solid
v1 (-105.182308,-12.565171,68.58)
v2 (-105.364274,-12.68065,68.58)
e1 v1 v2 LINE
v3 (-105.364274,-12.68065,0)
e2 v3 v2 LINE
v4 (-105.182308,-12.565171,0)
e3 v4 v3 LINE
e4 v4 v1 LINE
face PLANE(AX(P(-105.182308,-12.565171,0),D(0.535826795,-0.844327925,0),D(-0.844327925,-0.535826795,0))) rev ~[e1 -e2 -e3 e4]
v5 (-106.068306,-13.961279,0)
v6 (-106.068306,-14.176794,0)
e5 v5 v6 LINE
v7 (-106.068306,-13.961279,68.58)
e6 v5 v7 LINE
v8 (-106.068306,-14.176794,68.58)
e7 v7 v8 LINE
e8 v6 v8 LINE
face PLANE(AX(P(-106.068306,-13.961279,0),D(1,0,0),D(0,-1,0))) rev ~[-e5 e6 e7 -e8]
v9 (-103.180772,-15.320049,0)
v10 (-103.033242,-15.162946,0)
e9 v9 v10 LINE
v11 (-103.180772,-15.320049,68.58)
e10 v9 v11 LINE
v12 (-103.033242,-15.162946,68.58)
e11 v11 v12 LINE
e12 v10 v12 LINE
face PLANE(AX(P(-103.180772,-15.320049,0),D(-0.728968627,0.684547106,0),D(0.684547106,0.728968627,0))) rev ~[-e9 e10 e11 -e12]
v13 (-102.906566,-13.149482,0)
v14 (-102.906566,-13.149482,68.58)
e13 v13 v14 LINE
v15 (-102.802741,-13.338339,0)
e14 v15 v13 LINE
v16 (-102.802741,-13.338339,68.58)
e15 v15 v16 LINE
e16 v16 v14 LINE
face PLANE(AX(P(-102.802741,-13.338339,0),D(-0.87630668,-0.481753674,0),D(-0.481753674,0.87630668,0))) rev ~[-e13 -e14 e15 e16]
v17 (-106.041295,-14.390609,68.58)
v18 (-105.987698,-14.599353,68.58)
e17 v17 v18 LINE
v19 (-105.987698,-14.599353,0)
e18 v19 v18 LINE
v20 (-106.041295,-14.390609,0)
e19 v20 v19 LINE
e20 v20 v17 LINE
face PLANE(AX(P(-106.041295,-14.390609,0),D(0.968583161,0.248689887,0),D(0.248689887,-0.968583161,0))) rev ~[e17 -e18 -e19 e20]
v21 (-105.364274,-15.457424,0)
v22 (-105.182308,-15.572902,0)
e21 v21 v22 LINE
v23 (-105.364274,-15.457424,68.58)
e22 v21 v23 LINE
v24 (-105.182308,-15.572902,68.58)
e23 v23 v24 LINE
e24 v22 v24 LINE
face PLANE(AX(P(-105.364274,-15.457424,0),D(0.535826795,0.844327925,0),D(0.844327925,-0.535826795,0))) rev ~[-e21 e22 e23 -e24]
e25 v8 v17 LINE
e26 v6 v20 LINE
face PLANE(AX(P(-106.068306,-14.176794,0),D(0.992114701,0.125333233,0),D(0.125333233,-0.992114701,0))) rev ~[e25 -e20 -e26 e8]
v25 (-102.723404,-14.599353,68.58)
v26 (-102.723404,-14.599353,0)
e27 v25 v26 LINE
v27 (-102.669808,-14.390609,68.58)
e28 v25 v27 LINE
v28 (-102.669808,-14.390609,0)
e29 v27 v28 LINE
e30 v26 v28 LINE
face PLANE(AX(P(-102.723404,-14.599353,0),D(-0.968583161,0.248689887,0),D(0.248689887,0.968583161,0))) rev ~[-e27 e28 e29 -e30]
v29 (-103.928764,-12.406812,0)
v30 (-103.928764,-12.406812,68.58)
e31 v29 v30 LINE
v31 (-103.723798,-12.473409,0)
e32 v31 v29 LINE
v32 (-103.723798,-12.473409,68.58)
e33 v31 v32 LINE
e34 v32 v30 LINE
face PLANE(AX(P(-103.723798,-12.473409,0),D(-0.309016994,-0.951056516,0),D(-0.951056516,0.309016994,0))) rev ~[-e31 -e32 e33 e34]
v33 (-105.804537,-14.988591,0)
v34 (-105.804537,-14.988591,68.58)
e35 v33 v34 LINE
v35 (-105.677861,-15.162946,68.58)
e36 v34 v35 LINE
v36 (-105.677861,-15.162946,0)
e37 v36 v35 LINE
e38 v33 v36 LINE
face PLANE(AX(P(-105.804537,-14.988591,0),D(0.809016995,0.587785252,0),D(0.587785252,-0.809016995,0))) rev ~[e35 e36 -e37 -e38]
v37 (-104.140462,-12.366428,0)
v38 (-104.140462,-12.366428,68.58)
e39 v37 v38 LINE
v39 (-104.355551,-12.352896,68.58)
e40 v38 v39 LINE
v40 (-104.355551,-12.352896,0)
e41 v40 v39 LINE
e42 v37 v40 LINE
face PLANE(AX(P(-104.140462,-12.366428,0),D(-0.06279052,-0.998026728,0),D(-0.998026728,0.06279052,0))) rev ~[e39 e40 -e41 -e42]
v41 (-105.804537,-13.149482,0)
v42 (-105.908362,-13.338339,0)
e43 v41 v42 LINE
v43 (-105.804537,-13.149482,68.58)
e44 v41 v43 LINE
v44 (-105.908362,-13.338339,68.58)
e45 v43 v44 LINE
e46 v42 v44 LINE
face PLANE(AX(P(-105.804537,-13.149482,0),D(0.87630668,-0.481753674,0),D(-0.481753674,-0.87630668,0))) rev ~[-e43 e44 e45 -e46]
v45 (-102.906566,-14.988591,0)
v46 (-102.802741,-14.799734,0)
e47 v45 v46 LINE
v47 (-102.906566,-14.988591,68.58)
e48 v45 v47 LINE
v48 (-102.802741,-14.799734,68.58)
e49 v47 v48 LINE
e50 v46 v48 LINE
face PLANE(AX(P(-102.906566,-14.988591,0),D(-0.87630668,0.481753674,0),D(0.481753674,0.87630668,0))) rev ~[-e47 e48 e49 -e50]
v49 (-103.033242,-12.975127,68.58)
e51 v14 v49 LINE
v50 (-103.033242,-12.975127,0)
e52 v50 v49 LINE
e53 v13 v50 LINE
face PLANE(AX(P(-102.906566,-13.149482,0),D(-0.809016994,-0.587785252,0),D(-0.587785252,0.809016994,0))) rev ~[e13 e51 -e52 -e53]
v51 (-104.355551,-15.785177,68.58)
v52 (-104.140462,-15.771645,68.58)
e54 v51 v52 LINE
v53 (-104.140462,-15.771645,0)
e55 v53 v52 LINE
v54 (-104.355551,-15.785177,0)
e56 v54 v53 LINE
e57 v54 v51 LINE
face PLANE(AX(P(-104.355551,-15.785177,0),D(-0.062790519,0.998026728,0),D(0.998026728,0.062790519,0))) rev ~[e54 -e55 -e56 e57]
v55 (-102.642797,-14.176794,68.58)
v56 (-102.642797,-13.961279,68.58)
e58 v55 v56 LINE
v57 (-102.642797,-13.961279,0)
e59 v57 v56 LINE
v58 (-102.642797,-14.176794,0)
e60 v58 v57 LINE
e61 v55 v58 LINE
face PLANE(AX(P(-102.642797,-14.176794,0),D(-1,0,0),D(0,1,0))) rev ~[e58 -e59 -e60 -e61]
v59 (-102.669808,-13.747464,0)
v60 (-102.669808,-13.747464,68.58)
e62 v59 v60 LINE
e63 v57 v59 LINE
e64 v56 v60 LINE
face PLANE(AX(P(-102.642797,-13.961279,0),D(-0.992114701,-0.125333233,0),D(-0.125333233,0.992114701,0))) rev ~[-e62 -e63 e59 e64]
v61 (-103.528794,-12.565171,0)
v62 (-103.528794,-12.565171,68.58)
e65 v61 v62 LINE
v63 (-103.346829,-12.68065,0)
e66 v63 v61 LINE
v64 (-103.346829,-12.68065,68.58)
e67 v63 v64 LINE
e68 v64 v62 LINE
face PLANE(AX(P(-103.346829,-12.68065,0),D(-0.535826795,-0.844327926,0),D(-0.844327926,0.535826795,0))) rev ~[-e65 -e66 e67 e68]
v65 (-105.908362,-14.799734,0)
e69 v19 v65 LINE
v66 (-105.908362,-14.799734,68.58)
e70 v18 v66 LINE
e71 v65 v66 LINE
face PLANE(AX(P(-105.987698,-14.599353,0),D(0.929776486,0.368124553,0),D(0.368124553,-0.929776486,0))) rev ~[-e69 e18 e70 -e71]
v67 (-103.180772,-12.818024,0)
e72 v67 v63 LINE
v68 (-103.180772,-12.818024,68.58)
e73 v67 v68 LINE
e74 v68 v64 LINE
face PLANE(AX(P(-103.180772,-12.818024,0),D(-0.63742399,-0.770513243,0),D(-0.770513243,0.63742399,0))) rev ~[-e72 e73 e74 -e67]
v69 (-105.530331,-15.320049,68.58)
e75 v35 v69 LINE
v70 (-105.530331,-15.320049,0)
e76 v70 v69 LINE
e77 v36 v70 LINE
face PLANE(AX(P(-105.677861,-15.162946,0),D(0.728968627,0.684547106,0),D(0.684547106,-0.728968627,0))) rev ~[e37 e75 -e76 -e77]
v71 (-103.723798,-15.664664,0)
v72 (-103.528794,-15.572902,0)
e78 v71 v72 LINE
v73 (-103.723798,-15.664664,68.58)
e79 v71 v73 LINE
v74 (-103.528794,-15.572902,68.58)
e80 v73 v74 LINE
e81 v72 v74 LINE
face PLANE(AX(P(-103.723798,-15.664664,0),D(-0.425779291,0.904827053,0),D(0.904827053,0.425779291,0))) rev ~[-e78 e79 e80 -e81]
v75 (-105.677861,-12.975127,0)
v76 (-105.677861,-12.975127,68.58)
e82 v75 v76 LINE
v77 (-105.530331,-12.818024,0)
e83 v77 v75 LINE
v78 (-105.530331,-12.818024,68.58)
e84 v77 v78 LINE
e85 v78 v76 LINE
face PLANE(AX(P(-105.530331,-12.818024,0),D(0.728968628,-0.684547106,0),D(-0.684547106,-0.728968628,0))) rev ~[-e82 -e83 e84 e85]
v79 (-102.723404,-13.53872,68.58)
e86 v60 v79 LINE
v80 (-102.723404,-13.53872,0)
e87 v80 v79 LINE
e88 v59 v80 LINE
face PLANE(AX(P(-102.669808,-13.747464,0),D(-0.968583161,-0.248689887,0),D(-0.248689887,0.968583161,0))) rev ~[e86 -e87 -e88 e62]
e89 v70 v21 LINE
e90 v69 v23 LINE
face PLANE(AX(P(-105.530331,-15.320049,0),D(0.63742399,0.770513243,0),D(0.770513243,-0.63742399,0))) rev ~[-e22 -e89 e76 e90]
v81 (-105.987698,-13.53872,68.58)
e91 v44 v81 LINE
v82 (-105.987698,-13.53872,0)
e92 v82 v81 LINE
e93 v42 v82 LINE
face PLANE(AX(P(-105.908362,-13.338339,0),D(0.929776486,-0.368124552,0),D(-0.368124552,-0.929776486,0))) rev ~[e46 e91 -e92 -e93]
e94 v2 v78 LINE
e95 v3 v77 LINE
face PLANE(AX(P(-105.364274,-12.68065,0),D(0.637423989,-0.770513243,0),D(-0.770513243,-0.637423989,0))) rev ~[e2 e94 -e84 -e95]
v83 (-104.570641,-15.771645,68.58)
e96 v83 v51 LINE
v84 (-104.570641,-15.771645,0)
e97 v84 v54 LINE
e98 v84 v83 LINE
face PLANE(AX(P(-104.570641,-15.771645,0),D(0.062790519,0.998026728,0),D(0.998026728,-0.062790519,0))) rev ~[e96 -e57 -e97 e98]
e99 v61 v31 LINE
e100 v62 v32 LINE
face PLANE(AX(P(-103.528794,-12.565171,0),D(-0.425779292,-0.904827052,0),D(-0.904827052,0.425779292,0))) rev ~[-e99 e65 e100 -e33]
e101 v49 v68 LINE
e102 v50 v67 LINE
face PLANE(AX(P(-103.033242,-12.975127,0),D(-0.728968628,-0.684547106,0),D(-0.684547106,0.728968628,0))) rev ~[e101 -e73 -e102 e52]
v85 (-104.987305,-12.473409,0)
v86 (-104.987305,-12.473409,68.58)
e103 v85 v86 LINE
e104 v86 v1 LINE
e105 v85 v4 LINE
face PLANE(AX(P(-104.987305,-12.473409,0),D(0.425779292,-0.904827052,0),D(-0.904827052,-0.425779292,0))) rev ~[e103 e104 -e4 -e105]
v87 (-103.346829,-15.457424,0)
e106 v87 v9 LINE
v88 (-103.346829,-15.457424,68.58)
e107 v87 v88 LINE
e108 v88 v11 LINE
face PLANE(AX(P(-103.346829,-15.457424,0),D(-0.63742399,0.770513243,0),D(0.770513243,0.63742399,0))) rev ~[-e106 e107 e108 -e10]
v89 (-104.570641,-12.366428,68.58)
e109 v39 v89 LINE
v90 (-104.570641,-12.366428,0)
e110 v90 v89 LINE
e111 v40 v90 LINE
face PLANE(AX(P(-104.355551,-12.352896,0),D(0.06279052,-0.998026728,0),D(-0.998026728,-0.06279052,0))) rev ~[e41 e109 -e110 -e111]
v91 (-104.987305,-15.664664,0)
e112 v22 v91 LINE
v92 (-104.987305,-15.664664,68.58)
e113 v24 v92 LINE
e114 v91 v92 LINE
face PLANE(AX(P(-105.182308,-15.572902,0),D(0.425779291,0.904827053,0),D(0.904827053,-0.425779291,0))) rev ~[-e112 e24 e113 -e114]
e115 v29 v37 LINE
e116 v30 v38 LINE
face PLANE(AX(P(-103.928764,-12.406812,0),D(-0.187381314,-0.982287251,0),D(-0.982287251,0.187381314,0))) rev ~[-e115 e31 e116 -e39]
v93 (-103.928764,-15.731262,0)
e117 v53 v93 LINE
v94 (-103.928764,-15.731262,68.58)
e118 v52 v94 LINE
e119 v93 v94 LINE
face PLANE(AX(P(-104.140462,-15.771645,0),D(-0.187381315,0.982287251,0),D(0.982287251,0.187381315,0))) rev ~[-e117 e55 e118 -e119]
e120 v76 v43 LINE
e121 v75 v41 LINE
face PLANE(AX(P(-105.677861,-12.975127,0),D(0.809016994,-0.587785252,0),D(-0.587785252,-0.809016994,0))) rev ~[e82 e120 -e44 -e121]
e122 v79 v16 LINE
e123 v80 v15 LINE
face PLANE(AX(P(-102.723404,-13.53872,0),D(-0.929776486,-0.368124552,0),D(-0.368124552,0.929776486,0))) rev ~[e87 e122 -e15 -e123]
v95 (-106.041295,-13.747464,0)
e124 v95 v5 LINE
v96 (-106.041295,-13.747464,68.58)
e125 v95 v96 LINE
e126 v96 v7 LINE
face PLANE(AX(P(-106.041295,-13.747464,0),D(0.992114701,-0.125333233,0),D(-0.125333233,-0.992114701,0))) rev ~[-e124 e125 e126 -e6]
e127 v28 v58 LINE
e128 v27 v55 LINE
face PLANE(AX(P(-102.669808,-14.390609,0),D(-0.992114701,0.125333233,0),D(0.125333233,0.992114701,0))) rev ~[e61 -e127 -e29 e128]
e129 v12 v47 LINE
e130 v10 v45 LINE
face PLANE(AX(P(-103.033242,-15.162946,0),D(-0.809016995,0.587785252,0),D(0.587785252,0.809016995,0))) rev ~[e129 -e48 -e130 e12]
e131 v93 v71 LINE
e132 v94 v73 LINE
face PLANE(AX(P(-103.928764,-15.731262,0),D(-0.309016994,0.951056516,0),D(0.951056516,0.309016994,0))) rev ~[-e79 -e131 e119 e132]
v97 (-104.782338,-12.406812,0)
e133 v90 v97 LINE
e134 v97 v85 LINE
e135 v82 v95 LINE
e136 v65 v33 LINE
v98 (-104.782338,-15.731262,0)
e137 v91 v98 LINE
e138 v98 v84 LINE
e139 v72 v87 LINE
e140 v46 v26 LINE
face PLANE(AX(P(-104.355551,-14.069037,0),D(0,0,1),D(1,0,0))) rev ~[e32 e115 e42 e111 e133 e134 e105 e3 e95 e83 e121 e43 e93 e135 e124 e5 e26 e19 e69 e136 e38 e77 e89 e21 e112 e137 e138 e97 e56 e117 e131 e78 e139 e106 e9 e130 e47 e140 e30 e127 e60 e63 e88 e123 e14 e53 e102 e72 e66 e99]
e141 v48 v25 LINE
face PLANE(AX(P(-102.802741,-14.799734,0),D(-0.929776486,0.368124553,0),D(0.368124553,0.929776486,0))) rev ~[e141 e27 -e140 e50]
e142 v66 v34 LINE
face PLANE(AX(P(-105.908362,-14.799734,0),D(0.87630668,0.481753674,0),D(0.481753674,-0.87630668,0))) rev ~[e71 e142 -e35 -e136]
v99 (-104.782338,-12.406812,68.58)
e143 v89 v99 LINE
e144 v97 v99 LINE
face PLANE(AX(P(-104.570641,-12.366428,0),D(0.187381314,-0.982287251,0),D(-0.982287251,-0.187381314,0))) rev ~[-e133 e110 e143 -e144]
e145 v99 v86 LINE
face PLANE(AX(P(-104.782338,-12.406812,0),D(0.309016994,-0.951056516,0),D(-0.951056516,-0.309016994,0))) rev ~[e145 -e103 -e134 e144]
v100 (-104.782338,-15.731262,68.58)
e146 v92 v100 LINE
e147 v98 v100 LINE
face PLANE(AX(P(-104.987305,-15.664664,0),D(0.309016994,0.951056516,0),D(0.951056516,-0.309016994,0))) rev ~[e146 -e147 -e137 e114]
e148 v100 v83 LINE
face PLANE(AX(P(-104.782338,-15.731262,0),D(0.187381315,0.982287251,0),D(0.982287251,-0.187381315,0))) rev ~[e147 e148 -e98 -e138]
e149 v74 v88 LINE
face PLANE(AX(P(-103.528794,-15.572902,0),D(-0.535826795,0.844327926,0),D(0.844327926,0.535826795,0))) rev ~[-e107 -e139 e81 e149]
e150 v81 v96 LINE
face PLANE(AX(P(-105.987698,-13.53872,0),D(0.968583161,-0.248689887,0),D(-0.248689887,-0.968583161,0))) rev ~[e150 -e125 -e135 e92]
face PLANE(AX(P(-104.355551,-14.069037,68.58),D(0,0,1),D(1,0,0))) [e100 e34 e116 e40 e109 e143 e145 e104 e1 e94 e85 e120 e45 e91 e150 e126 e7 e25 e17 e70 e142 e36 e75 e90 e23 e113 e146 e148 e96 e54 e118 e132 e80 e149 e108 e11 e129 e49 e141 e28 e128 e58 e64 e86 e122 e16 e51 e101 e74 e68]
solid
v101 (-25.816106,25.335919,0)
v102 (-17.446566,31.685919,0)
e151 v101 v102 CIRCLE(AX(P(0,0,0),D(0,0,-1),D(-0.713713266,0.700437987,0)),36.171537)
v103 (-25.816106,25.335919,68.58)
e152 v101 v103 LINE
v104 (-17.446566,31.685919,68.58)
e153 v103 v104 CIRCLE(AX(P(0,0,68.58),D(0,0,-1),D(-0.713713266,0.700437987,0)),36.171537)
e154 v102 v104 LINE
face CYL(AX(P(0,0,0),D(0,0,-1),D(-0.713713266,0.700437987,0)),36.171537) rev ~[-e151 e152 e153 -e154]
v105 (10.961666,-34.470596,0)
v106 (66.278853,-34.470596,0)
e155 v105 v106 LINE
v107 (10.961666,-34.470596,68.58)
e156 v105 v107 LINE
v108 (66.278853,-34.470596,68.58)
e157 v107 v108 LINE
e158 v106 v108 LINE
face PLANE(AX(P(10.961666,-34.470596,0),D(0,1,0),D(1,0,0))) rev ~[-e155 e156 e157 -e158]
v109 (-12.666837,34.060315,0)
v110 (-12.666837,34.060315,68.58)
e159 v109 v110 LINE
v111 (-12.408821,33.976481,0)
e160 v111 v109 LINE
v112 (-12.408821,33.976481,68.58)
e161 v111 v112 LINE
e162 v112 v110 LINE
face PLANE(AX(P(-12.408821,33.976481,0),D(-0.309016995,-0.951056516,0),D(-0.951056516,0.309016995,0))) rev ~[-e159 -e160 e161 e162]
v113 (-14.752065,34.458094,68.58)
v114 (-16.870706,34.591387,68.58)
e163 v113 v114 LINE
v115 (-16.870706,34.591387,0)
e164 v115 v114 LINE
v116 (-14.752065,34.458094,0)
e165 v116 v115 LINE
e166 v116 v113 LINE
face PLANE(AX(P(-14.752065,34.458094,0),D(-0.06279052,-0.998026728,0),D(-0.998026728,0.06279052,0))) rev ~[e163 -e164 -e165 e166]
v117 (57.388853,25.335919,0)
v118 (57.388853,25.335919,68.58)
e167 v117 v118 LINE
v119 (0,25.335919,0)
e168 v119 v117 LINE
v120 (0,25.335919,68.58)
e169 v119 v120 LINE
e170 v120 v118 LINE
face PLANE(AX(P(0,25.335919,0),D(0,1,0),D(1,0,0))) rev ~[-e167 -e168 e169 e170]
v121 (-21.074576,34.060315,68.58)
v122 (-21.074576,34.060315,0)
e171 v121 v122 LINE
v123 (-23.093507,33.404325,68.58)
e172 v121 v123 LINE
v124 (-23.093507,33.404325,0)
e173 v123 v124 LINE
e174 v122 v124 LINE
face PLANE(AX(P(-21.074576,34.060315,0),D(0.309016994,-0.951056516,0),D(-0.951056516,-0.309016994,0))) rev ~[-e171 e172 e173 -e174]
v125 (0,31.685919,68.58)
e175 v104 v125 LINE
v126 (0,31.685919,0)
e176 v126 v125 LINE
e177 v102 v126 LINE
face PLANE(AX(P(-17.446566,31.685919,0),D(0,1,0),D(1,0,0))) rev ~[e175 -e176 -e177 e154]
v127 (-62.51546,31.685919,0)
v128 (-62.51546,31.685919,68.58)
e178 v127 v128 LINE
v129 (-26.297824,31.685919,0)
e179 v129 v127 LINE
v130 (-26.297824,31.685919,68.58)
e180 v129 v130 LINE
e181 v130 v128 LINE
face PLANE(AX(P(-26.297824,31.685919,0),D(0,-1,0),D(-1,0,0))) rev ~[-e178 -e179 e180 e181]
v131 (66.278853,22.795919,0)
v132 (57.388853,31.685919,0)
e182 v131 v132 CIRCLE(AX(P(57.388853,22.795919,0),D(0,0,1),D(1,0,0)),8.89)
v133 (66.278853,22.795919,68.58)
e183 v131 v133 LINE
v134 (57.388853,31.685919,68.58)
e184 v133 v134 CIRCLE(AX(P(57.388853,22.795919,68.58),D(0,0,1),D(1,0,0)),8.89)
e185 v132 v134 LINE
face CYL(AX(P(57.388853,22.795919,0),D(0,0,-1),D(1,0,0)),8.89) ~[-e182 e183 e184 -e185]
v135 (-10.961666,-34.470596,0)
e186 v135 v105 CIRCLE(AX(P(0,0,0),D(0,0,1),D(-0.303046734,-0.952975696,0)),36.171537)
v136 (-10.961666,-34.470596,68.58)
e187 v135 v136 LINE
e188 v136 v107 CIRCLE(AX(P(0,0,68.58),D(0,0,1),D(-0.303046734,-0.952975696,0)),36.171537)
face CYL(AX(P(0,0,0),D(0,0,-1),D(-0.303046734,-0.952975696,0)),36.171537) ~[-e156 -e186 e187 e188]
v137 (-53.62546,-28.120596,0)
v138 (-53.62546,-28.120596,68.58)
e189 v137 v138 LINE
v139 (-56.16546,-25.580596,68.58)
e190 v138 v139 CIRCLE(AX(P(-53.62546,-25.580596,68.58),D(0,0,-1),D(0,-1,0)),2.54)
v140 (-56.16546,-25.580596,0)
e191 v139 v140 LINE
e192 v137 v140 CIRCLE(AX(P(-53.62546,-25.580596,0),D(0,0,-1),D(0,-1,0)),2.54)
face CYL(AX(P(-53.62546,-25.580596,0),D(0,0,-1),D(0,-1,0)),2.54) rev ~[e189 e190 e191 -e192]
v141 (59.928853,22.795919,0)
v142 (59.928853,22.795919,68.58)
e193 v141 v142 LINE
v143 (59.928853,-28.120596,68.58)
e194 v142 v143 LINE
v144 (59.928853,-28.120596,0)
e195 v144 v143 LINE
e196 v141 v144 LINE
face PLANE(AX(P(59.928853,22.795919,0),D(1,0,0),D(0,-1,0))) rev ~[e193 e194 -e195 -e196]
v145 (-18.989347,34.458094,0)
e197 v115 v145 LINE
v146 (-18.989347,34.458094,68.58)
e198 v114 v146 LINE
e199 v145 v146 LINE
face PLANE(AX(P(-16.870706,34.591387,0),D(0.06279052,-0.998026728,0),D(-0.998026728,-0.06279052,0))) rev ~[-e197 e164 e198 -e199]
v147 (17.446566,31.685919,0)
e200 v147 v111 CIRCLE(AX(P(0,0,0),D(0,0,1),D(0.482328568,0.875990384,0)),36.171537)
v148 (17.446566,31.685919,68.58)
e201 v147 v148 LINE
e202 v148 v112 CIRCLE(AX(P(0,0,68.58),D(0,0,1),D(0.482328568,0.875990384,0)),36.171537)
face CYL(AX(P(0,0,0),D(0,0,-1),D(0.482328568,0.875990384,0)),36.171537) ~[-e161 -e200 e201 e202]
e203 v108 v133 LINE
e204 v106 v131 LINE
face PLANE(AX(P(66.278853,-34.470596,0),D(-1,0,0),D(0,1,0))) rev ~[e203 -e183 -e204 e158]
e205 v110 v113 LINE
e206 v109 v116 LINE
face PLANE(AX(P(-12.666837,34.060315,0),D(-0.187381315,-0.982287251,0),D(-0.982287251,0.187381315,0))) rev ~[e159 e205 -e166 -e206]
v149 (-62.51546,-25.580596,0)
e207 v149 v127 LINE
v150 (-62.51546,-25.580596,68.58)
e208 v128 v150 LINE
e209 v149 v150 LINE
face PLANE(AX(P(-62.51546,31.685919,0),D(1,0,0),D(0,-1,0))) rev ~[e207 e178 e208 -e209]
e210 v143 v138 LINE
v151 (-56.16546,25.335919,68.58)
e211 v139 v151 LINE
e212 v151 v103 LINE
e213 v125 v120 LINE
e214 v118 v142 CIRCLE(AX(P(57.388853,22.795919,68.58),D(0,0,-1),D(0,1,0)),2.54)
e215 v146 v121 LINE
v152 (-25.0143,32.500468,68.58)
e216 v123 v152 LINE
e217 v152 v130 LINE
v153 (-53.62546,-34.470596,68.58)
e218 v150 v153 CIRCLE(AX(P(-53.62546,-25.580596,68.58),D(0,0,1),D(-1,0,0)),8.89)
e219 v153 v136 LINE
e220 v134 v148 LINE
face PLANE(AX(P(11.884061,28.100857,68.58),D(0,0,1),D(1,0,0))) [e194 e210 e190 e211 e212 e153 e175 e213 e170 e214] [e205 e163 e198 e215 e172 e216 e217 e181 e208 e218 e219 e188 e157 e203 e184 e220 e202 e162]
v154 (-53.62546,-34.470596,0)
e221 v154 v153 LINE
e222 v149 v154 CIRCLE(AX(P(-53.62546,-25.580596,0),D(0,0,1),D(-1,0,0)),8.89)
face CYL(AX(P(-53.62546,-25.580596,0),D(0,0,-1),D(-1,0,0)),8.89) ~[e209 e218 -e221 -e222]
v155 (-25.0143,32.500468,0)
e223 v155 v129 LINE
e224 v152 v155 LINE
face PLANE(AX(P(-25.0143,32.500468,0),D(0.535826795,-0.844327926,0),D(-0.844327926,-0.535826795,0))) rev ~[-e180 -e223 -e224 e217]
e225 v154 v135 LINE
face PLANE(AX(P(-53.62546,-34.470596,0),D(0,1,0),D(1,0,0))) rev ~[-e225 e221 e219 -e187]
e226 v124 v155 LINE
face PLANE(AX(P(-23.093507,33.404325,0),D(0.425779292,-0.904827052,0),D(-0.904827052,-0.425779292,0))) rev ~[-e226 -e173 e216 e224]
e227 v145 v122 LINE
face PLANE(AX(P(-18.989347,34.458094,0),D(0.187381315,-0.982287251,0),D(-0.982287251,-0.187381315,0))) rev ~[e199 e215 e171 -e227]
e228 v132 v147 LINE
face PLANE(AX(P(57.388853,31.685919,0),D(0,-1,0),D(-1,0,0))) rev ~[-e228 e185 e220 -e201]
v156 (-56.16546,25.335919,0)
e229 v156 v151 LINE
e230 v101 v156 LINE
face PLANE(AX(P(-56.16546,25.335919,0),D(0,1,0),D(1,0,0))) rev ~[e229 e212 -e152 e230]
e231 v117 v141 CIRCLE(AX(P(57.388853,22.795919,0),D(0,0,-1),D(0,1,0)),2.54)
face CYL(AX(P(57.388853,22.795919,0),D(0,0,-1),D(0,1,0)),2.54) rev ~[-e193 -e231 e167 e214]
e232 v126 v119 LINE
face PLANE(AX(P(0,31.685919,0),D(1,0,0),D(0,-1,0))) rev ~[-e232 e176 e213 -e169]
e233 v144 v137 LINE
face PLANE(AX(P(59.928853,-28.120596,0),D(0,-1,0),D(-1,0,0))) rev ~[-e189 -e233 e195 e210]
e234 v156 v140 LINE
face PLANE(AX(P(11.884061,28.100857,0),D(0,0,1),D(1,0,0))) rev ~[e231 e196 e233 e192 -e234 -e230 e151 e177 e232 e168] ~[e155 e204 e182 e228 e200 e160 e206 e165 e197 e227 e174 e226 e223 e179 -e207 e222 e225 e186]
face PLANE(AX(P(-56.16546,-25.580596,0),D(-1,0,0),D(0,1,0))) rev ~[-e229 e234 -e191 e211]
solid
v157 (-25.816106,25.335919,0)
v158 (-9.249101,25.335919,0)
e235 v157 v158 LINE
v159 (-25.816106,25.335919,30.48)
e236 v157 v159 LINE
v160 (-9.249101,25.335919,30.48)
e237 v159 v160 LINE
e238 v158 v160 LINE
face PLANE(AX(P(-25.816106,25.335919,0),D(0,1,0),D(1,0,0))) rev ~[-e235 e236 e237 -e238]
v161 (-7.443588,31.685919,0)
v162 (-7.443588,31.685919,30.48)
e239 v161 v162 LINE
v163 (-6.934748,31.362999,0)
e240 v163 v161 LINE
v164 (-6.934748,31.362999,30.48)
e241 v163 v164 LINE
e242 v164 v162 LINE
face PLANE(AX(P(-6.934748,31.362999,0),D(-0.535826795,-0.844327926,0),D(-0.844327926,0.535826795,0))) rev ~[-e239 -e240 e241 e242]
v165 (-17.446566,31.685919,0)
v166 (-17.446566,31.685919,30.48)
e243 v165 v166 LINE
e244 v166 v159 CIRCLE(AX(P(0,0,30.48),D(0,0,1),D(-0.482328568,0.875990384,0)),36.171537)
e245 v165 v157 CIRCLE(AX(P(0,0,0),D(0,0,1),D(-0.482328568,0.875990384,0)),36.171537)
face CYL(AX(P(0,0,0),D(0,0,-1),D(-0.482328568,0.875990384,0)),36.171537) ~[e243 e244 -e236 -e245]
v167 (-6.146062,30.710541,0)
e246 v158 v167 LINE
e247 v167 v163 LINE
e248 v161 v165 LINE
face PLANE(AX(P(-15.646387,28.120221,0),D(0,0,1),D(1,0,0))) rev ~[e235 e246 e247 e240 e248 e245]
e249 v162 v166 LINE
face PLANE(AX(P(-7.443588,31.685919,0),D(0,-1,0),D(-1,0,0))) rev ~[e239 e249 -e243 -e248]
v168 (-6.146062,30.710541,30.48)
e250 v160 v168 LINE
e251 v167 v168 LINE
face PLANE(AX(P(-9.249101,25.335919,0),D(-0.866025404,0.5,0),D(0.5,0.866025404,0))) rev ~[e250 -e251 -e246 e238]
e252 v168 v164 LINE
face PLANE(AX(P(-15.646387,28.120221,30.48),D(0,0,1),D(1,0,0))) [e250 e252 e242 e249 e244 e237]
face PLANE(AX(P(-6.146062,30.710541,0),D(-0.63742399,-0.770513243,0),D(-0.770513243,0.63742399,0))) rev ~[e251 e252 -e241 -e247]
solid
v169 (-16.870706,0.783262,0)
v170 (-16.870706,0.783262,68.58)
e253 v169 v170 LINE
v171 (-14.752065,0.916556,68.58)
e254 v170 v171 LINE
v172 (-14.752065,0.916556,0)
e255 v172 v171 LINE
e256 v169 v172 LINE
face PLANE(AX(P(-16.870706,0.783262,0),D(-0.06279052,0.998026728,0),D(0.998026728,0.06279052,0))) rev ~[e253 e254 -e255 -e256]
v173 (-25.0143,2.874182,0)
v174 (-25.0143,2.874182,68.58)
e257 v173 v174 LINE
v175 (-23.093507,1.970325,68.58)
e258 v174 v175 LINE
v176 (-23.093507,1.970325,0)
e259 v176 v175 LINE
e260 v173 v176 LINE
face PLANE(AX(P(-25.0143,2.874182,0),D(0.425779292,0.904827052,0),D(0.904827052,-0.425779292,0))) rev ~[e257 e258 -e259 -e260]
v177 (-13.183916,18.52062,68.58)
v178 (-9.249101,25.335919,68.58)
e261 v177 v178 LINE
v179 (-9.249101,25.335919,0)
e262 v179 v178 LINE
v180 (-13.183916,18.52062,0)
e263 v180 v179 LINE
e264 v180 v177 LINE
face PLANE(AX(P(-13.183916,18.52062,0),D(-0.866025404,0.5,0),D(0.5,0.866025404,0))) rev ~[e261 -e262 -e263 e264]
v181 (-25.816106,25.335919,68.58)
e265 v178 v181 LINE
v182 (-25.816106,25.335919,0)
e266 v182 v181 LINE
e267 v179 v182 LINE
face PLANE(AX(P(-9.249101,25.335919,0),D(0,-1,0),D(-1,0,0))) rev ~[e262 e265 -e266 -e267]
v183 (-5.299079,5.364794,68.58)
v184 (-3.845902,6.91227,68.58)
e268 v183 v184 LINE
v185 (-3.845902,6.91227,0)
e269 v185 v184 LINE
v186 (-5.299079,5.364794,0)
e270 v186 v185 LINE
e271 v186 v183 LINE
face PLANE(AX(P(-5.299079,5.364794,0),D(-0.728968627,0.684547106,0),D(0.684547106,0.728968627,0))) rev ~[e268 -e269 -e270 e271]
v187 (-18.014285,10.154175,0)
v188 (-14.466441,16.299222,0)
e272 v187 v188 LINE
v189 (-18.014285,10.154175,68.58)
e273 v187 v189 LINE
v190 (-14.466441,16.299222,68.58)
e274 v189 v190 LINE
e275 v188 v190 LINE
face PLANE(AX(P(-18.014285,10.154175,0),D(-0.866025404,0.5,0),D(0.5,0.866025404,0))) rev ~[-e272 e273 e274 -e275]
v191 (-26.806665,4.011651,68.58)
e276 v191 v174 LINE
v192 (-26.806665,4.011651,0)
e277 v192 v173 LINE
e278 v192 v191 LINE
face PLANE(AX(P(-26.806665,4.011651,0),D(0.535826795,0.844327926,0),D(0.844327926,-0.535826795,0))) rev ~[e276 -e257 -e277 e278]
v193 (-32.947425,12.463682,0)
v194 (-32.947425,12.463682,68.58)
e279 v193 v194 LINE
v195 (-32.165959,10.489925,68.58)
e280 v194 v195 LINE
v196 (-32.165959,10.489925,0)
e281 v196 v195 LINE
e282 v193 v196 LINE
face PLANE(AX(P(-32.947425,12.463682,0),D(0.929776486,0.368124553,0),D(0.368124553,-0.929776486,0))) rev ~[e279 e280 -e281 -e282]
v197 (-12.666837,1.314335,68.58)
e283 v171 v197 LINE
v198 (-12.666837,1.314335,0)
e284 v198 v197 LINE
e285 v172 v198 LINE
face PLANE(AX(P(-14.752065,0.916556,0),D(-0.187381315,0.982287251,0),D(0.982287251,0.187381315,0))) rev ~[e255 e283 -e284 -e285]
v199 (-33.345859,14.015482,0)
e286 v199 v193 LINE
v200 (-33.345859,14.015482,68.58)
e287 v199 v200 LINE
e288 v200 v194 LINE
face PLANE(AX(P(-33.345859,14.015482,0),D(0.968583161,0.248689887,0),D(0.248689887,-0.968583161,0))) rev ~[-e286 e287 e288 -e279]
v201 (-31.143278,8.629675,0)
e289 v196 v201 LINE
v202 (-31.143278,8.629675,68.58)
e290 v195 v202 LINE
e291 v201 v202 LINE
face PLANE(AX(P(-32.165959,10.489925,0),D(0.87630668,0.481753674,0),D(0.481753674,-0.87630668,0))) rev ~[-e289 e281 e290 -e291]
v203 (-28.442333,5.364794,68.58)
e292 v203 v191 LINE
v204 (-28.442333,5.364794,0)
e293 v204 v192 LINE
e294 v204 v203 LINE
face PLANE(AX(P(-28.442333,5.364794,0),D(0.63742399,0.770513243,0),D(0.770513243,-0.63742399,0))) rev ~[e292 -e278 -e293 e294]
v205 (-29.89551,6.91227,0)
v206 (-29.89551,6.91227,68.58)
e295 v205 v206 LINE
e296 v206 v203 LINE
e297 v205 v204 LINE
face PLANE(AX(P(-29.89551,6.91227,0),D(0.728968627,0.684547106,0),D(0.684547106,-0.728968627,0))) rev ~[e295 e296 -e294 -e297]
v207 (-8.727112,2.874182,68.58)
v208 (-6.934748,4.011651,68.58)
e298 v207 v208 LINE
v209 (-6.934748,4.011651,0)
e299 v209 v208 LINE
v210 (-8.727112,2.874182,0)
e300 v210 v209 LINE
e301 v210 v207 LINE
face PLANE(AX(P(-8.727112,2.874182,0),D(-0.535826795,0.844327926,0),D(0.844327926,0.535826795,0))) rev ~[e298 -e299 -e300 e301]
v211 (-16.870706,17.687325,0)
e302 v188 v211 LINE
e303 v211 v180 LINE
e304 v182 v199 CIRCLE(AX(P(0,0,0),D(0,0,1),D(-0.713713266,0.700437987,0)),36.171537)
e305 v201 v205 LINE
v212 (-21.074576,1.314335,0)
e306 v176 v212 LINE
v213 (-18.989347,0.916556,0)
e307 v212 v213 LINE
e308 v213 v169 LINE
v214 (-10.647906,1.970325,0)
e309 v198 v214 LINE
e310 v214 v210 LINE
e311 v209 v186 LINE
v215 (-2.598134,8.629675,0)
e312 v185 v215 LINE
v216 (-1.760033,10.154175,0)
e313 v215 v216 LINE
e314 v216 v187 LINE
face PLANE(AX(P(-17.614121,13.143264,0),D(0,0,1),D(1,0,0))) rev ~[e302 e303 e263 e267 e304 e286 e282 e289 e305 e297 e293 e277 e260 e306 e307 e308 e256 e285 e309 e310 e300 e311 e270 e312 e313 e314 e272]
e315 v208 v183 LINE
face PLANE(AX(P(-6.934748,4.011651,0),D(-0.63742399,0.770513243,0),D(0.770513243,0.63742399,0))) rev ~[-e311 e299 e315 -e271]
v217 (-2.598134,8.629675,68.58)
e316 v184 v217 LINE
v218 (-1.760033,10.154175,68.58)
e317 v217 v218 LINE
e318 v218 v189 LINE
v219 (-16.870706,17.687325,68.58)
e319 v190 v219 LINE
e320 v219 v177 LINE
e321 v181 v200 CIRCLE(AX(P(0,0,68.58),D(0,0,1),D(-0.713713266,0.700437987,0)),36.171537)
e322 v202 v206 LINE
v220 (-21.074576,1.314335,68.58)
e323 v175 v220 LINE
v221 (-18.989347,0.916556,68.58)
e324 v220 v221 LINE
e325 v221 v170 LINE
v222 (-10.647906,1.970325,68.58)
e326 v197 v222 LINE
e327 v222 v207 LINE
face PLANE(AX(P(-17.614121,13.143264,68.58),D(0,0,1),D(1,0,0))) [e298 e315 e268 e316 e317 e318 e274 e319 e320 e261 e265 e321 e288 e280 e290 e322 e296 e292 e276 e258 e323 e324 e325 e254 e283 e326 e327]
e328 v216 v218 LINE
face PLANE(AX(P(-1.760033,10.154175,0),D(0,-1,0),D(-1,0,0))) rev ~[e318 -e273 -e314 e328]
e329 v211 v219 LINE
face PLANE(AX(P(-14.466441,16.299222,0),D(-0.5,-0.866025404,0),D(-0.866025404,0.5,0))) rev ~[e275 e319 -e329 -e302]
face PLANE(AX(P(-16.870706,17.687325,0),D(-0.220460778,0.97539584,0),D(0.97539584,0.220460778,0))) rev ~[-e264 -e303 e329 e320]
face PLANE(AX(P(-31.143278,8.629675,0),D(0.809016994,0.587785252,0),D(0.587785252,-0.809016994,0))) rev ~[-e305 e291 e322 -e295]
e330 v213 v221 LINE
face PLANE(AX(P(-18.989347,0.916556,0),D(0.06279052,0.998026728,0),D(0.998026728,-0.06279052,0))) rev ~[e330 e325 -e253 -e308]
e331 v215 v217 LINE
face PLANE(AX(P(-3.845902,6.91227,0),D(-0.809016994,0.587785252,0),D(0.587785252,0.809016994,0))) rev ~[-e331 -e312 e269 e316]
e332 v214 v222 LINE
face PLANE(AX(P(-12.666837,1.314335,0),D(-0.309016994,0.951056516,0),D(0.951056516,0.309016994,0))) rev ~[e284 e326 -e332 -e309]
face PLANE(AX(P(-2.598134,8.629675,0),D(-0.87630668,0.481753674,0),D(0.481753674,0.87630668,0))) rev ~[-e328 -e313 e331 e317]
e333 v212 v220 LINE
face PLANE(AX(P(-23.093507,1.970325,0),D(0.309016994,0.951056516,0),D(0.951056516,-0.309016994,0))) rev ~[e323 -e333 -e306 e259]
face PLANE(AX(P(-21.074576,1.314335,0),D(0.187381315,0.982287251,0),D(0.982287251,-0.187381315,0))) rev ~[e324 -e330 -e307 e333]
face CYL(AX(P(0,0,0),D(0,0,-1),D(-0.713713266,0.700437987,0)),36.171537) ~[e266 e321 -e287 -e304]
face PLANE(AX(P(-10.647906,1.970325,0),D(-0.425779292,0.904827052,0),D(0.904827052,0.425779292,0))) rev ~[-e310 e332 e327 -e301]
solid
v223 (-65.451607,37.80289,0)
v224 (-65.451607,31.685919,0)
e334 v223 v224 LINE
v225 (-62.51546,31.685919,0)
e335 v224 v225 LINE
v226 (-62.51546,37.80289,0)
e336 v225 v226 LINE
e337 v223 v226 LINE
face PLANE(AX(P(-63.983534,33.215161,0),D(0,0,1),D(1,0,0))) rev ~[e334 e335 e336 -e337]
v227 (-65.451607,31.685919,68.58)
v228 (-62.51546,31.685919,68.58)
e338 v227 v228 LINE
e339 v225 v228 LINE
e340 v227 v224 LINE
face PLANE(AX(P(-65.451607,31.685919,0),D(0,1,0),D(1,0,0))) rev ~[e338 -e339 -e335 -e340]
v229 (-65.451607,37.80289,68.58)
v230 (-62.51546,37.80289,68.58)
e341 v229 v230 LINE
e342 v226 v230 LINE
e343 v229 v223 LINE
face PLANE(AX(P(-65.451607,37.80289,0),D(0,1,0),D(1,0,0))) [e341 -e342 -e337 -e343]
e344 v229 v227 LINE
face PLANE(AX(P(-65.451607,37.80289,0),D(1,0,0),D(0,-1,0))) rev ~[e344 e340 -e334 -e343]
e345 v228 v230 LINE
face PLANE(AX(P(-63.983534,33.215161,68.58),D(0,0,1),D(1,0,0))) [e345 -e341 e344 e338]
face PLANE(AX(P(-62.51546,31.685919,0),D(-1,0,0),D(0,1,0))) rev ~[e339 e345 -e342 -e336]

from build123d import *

# Parameters (mm, degrees)
F1_DEPTH = 25.4
F0_W     = 2.9361471534
F0_H     = 3.0584856868
F2_DEPTH = 25.4
F3_DEPTH = 68.58
F4_DEPTH = 30.48


# Not quite as in the source:
# - the program builds the solid bodies; features that only make, move or delete a surface that nothing else refers to are left out


with BuildPart() as f1:
    # F0 (on Top) → F1 (new body)
    with BuildSketch(Plane.XY):
        Polygon((-62.5154599547, 0), (-56.1654599547, 0), (-56.1654599547, 25.3359185696), (-31.9179130904, 25.3359185696), (-31.1432781089, 26.7449743701), (-29.895510103, 28.4623796944), (-28.4423331579, 30.0098559658), (-26.8066647421, 31.3629985591), (-26.2978242266, 31.6859185696), (-62.5154599547, 31.6859185696), align=None)
    extrude(amount=F1_DEPTH)

    # F0 (on Top) → F2 (join)
    with BuildSketch(Plane.XY):
        with BuildLine():
            Line((0, 25.3359185696), (25.8161057919, 25.3359185696))
            ThreePointArc((25.8161057919, 25.3359185696), (21.8631038448, 28.8163977328), (17.4465656341, 31.6859185696))
            Line((17.4465656341, 31.6859185696), (0, 31.6859185696))
            Line((0, 31.6859185696), (0, 25.3359185696))
        make_face()
        with BuildLine():
            ThreePointArc((17.4465656341, 31.6859185696), (21.8631038448, 28.8163977328), (25.8161057919, 25.3359185696))
            Line((25.8161057919, 25.3359185696), (57.3888527393, 25.3359185696))
            ThreePointArc((57.3888527393, 25.3359185696), (59.1849039635, 24.5919697938), (59.9288527393, 22.7959185696))
            Line((59.9288527393, 22.7959185696), (59.9288527393, 0))
            Line((59.9288527393, 0), (66.2788527393, 0))
            Line((66.2788527393, 0), (66.2788527393, 22.7959185696))
            ThreePointArc((66.2788527393, 22.7959185696), (63.6750320241, 29.0820978543), (57.3888527393, 31.6859185696))
            Line((57.3888527393, 31.6859185696), (17.4465656341, 31.6859185696))
        make_face()
        with BuildLine():
            Line((59.9288527393, -28.1205956364), (22.7510920415, -28.1205956364))
            ThreePointArc((22.7510920415, -28.1205956364), (17.1527881407, -31.8459094237), (10.9616661369, -34.4705956364))
            Line((10.9616661369, -34.4705956364), (66.2788527393, -34.4705956364))
            Line((66.2788527393, -34.4705956364), (66.2788527393, 0))
            Line((66.2788527393, 0), (59.9288527393, 0))
            Line((59.9288527393, 0), (59.9288527393, -28.1205956364))
        make_face()
        with BuildLine():
            ThreePointArc((10.9616661369, -34.4705956364), (17.1527881407, -31.8459094237), (22.7510920415, -28.1205956364))
            Line((22.7510920415, -28.1205956364), (0, -28.1205956364))
            Line((0, -28.1205956364), (0, -34.4705956364))
            Line((0, -34.4705956364), (10.9616661369, -34.4705956364))
        make_face()
        with BuildLine():
            Line((0, 31.6859185696), (17.4465656341, 31.6859185696))
            ThreePointArc((17.4465656341, 31.6859185696), (2.7670174678, 36.0655473043), (-12.4088213224, 33.9764807096))
            Line((-12.4088213224, 33.9764807096), (-10.6479057106, 33.404324544))
            Line((-10.6479057106, 33.404324544), (-8.727111947, 32.5004676073))
            Line((-8.727111947, 32.5004676073), (-7.4435880441, 31.6859185696))
            Line((-7.4435880441, 31.6859185696), (0, 31.6859185696))
        make_face()
        with Locations((-63.9835335314, 33.215161413)):
            Rectangle(F0_W, F0_H)
        with BuildLine():
            ThreePointArc((-10.9616661369, -34.4705956364), (0, -36.1715369873), (10.9616661369, -34.4705956364))
            Line((10.9616661369, -34.4705956364), (0, -34.4705956364))
            Line((0, -34.4705956364), (-10.9616661369, -34.4705956364))
        make_face()
        with BuildLine():
            Line((0, -34.4705956364), (0, -28.1205956364))
            Line((0, -28.1205956364), (-22.7510920415, -28.1205956364))
            ThreePointArc((-22.7510920415, -28.1205956364), (-17.1527881407, -31.8459094237), (-10.9616661369, -34.4705956364))
            Line((-10.9616661369, -34.4705956364), (0, -34.4705956364))
        make_face()
        with BuildLine():
            Line((-10.6479057106, 33.404324544), (-12.4088213224, 33.9764807096))
            ThreePointArc((-12.4088213224, 33.9764807096), (-14.9715630884, 32.9276841991), (-17.4465656341, 31.6859185696))
            Line((-17.4465656341, 31.6859185696), (-7.4435880441, 31.6859185696))
            Line((-7.4435880441, 31.6859185696), (-8.727111947, 32.5004676073))
            Line((-8.727111947, 32.5004676073), (-10.6479057106, 33.404324544))
        make_face()
        with BuildLine():
            ThreePointArc((-17.4465656341, 31.6859185696), (-14.9715630884, 32.9276841991), (-12.4088213224, 33.9764807096))
            Line((-12.4088213224, 33.9764807096), (-12.6668367542, 34.0603150054))
            Line((-12.6668367542, 34.0603150054), (-14.7520653292, 34.45809363))
            Line((-14.7520653292, 34.45809363), (-16.8707061353, 34.5913872114))
            Line((-16.8707061353, 34.5913872114), (-18.9893469415, 34.45809363))
            Line((-18.9893469415, 34.45809363), (-21.0745755165, 34.0603150054))
            Line((-21.0745755165, 34.0603150054), (-23.0935065601, 33.404324544))
            Line((-23.0935065601, 33.404324544), (-25.0143003236, 32.5004676073))
            Line((-25.0143003236, 32.5004676073), (-26.2978242266, 31.6859185696))
            Line((-26.2978242266, 31.6859185696), (-17.4465656341, 31.6859185696))
        make_face()
        with BuildLine():
            Line((-53.6254599547, -34.4705956364), (-10.9616661369, -34.4705956364))
            ThreePointArc((-10.9616661369, -34.4705956364), (-17.1527881407, -31.8459094237), (-22.7510920415, -28.1205956364))
            Line((-22.7510920415, -28.1205956364), (-53.6254599547, -28.1205956364))
            ThreePointArc((-53.6254599547, -28.1205956364), (-55.421511179, -27.3766468606), (-56.1654599547, -25.5805956364))
            Line((-56.1654599547, -25.5805956364), (-56.1654599547, 0))
            Line((-56.1654599547, 0), (-62.5154599547, 0))
            Line((-62.5154599547, 0), (-62.5154599547, -25.5805956364))
            ThreePointArc((-62.5154599547, -25.5805956364), (-59.9116392395, -31.8667749211), (-53.6254599547, -34.4705956364))
        make_face()
        Polygon((-62.5154599547, 0), (-56.1654599547, 0), (-56.1654599547, 25.3359185696), (-31.9179130904, 25.3359185696), (-31.1432781089, 26.7449743701), (-29.895510103, 28.4623796944), (-28.4423331579, 30.0098559658), (-26.8066647421, 31.3629985591), (-26.2978242266, 31.6859185696), (-62.5154599547, 31.6859185696), align=None)
        with BuildLine():
            ThreePointArc((-25.8161057919, 25.3359185696), (-21.8631038448, 28.8163977328), (-17.4465656341, 31.6859185696))
            Line((-17.4465656341, 31.6859185696), (-26.2978242266, 31.6859185696))
            Line((-26.2978242266, 31.6859185696), (-26.8066647421, 31.3629985591))
            Line((-26.8066647421, 31.3629985591), (-28.4423331579, 30.0098559658))
            Line((-28.4423331579, 30.0098559658), (-29.895510103, 28.4623796944))
            Line((-29.895510103, 28.4623796944), (-31.1432781089, 26.7449743701))
            Line((-31.1432781089, 26.7449743701), (-31.9179130904, 25.3359185696))
            Line((-31.9179130904, 25.3359185696), (-25.8161057919, 25.3359185696))
        make_face()
        with Locations((-63.9835335314, 36.2736470997)):
            Rectangle(F0_W, F0_H)
    extrude(amount=F2_DEPTH)

    # F0 (on Top) → F3, piece 2 (join)
    with BuildSketch(Plane.XY):
        with BuildLine():
            Line((0, 25.3359185696), (25.8161057919, 25.3359185696))
            ThreePointArc((25.8161057919, 25.3359185696), (21.8631038448, 28.8163977328), (17.4465656341, 31.6859185696))
            Line((17.4465656341, 31.6859185696), (0, 31.6859185696))
            Line((0, 31.6859185696), (0, 25.3359185696))
        make_face()
        with BuildLine():
            ThreePointArc((17.4465656341, 31.6859185696), (21.8631038448, 28.8163977328), (25.8161057919, 25.3359185696))
            Line((25.8161057919, 25.3359185696), (57.3888527393, 25.3359185696))
            ThreePointArc((57.3888527393, 25.3359185696), (59.1849039635, 24.5919697938), (59.9288527393, 22.7959185696))
            Line((59.9288527393, 22.7959185696), (59.9288527393, 0))
            Line((59.9288527393, 0), (66.2788527393, 0))
            Line((66.2788527393, 0), (66.2788527393, 22.7959185696))
            ThreePointArc((66.2788527393, 22.7959185696), (63.6750320241, 29.0820978543), (57.3888527393, 31.6859185696))
            Line((57.3888527393, 31.6859185696), (17.4465656341, 31.6859185696))
        make_face()
        with BuildLine():
            Line((59.9288527393, -28.1205956364), (22.7510920415, -28.1205956364))
            ThreePointArc((22.7510920415, -28.1205956364), (17.1527881407, -31.8459094237), (10.9616661369, -34.4705956364))
            Line((10.9616661369, -34.4705956364), (66.2788527393, -34.4705956364))
            Line((66.2788527393, -34.4705956364), (66.2788527393, 0))
            Line((66.2788527393, 0), (59.9288527393, 0))
            Line((59.9288527393, 0), (59.9288527393, -28.1205956364))
        make_face()
        with BuildLine():
            ThreePointArc((10.9616661369, -34.4705956364), (17.1527881407, -31.8459094237), (22.7510920415, -28.1205956364))
            Line((22.7510920415, -28.1205956364), (0, -28.1205956364))
            Line((0, -28.1205956364), (0, -34.4705956364))
            Line((0, -34.4705956364), (10.9616661369, -34.4705956364))
        make_face()
        with BuildLine():
            Line((0, 31.6859185696), (17.4465656341, 31.6859185696))
            ThreePointArc((17.4465656341, 31.6859185696), (2.7670174678, 36.0655473043), (-12.4088213224, 33.9764807096))
            Line((-12.4088213224, 33.9764807096), (-10.6479057106, 33.404324544))
            Line((-10.6479057106, 33.404324544), (-8.727111947, 32.5004676073))
            Line((-8.727111947, 32.5004676073), (-7.4435880441, 31.6859185696))
            Line((-7.4435880441, 31.6859185696), (0, 31.6859185696))
        make_face()
        with Locations((-63.9835335314, 33.215161413)):
            Rectangle(F0_W, F0_H)
        with BuildLine():
            ThreePointArc((-10.9616661369, -34.4705956364), (0, -36.1715369873), (10.9616661369, -34.4705956364))
            Line((10.9616661369, -34.4705956364), (0, -34.4705956364))
            Line((0, -34.4705956364), (-10.9616661369, -34.4705956364))
        make_face()
        with BuildLine():
            Line((0, -34.4705956364), (0, -28.1205956364))
            Line((0, -28.1205956364), (-22.7510920415, -28.1205956364))
            ThreePointArc((-22.7510920415, -28.1205956364), (-17.1527881407, -31.8459094237), (-10.9616661369, -34.4705956364))
            Line((-10.9616661369, -34.4705956364), (0, -34.4705956364))
        make_face()
        with BuildLine():
            Line((-10.6479057106, 33.404324544), (-12.4088213224, 33.9764807096))
            ThreePointArc((-12.4088213224, 33.9764807096), (-14.9715630884, 32.9276841991), (-17.4465656341, 31.6859185696))
            Line((-17.4465656341, 31.6859185696), (-7.4435880441, 31.6859185696))
            Line((-7.4435880441, 31.6859185696), (-8.727111947, 32.5004676073))
            Line((-8.727111947, 32.5004676073), (-10.6479057106, 33.404324544))
        make_face()
        with BuildLine():
            ThreePointArc((-17.4465656341, 31.6859185696), (-14.9715630884, 32.9276841991), (-12.4088213224, 33.9764807096))
            Line((-12.4088213224, 33.9764807096), (-12.6668367542, 34.0603150054))
            Line((-12.6668367542, 34.0603150054), (-14.7520653292, 34.45809363))
            Line((-14.7520653292, 34.45809363), (-16.8707061353, 34.5913872114))
            Line((-16.8707061353, 34.5913872114), (-18.9893469415, 34.45809363))
            Line((-18.9893469415, 34.45809363), (-21.0745755165, 34.0603150054))
            Line((-21.0745755165, 34.0603150054), (-23.0935065601, 33.404324544))
            Line((-23.0935065601, 33.404324544), (-25.0143003236, 32.5004676073))
            Line((-25.0143003236, 32.5004676073), (-26.2978242266, 31.6859185696))
            Line((-26.2978242266, 31.6859185696), (-17.4465656341, 31.6859185696))
        make_face()
        with BuildLine():
            Line((-53.6254599547, -34.4705956364), (-10.9616661369, -34.4705956364))
            ThreePointArc((-10.9616661369, -34.4705956364), (-17.1527881407, -31.8459094237), (-22.7510920415, -28.1205956364))
            Line((-22.7510920415, -28.1205956364), (-53.6254599547, -28.1205956364))
            ThreePointArc((-53.6254599547, -28.1205956364), (-55.421511179, -27.3766468606), (-56.1654599547, -25.5805956364))
            Line((-56.1654599547, -25.5805956364), (-56.1654599547, 0))
            Line((-56.1654599547, 0), (-62.5154599547, 0))
            Line((-62.5154599547, 0), (-62.5154599547, -25.5805956364))
            ThreePointArc((-62.5154599547, -25.5805956364), (-59.9116392395, -31.8667749211), (-53.6254599547, -34.4705956364))
        make_face()
        Polygon((-62.5154599547, 0), (-56.1654599547, 0), (-56.1654599547, 25.3359185696), (-31.9179130904, 25.3359185696), (-31.1432781089, 26.7449743701), (-29.895510103, 28.4623796944), (-28.4423331579, 30.0098559658), (-26.8066647421, 31.3629985591), (-26.2978242266, 31.6859185696), (-62.5154599547, 31.6859185696), align=None)
        with BuildLine():
            ThreePointArc((-25.8161057919, 25.3359185696), (-21.8631038448, 28.8163977328), (-17.4465656341, 31.6859185696))
            Line((-17.4465656341, 31.6859185696), (-26.2978242266, 31.6859185696))
            Line((-26.2978242266, 31.6859185696), (-26.8066647421, 31.3629985591))
            Line((-26.8066647421, 31.3629985591), (-28.4423331579, 30.0098559658))
            Line((-28.4423331579, 30.0098559658), (-29.895510103, 28.4623796944))
            Line((-29.895510103, 28.4623796944), (-31.1432781089, 26.7449743701))
            Line((-31.1432781089, 26.7449743701), (-31.9179130904, 25.3359185696))
            Line((-31.9179130904, 25.3359185696), (-25.8161057919, 25.3359185696))
        make_face()
        with Locations((-63.9835335314, 36.2736470997)):
            Rectangle(F0_W, F0_H)
        with BuildLine():
            ThreePointArc((-25.8161057919, 25.3359185696), (-30.1176460126, 20.0326604994), (-33.3458594379, 14.015482381))
            Line((-33.3458594379, 14.015482381), (-32.9474248719, 12.4636822018))
            Line((-32.9474248719, 12.4636822018), (-32.1659591287, 10.4899250394))
            Line((-32.1659591287, 10.4899250394), (-31.1432781089, 8.6296751702))
            Line((-31.1432781089, 8.6296751702), (-29.895510103, 6.9122698459))
            Line((-29.895510103, 6.9122698459), (-28.4423331579, 5.3647935745))
            Line((-28.4423331579, 5.3647935745), (-26.8066647421, 4.0116509812))
            Line((-26.8066647421, 4.0116509812), (-25.0143003236, 2.8741819331))
            Line((-25.0143003236, 2.8741819331), (-23.0935065601, 1.9703249963))
            Line((-23.0935065601, 1.9703249963), (-21.0745755165, 1.3143345349))
            Line((-21.0745755165, 1.3143345349), (-18.9893469415, 0.9165559103))
            Line((-18.9893469415, 0.9165559103), (-16.8707061353, 0.783262329))
            Line((-16.8707061353, 0.783262329), (-14.7520653292, 0.9165559103))
            Line((-14.7520653292, 0.9165559103), (-12.6668367542, 1.3143345349))
            Line((-12.6668367542, 1.3143345349), (-10.6479057106, 1.9703249963))
            Line((-10.6479057106, 1.9703249963), (-8.727111947, 2.8741819331))
            Line((-8.727111947, 2.8741819331), (-6.9347475286, 4.0116509812))
            Line((-6.9347475286, 4.0116509812), (-5.2990791128, 5.3647935745))
            Line((-5.2990791128, 5.3647935745), (-3.8459021677, 6.9122698459))
            Line((-3.8459021677, 6.9122698459), (-2.5981341618, 8.6296751702))
            Line((-2.5981341618, 8.6296751702), (-1.7600334856, 10.1541746408))
            Line((-1.7600334856, 10.1541746408), (-18.0142852782, 10.1541746408))
            Line((-18.0142852782, 10.1541746408), (-14.4664408012, 16.2992215323))
            Line((-14.4664408012, 16.2992215323), (-16.8707061353, 17.6873247702))
            Line((-16.8707061353, 17.6873247702), (-13.1839158222, 18.5206199579))
            Line((-13.1839158222, 18.5206199579), (-9.2491013341, 25.3359185696))
            Line((-9.2491013341, 25.3359185696), (-25.8161057919, 25.3359185696))
        make_face()
    extrude(amount=F3_DEPTH)


with BuildPart() as f2:
    # F0 (on Top) → F2, piece 2 (new body)
    with BuildSketch(Plane.XY):
        Polygon((-102.6427969337, -14.1767939518), (-102.6427969337, -13.9612792094), (-102.6698080932, -13.7474638651), (-102.7234044302, -13.5387199147), (-102.8027406983, -13.3383393748), (-102.9065657173, -13.1494823664), (-103.0332421045, -12.9751272773), (-103.1807720977, -12.8180237913), (-103.3468290607, -12.6806495244), (-103.5287941761, -12.5651709507), (-103.7237977452, -12.4734092363), (-103.9287644453, -12.4068115184), (-104.1404618291, -12.3664280827), (-104.3555513024, -12.3528958), (-104.5706407757, -12.3664280827), (-104.7823381595, -12.4068115184), (-104.9873048596, -12.4734092363), (-105.1823084288, -12.5651709507), (-105.3642735441, -12.6806495244), (-105.5303305072, -12.8180237913), (-105.6778605004, -12.9751272773), (-105.8045368876, -13.1494823664), (-105.9083619066, -13.3383393748), (-105.9876981747, -13.5387199147), (-106.0412945117, -13.7474638651), (-106.0683056712, -13.9612792094), (-106.0683056712, -14.1767939518), (-106.0412945117, -14.3906092961), (-105.9876981747, -14.5993532466), (-105.9083619066, -14.7997337864), (-105.8045368876, -14.9885907948), (-105.6778605004, -15.162945884), (-105.5303305072, -15.3200493699), (-105.3642735441, -15.4574236369), (-105.1823084288, -15.5729022106), (-104.9873048596, -15.6646639249), (-104.7823381595, -15.7312616428), (-104.5706407757, -15.7716450786), (-104.3555513024, -15.7851773612), (-104.1404618291, -15.7716450786), (-103.9287644453, -15.7312616428), (-103.7237977452, -15.6646639249), (-103.5287941761, -15.5729022106), (-103.3468290607, -15.4574236369), (-103.1807720977, -15.3200493699), (-103.0332421045, -15.162945884), (-102.9065657173, -14.9885907948), (-102.8027406983, -14.7997337864), (-102.7234044302, -14.5993532466), (-102.6698080932, -14.3906092961), align=None)
    extrude(amount=F2_DEPTH)

    # F0 (on Top) → F3 (join)
    with BuildSketch(Plane.XY):
        Polygon((-102.6427969337, -14.1767939518), (-102.6427969337, -13.9612792094), (-102.6698080932, -13.7474638651), (-102.7234044302, -13.5387199147), (-102.8027406983, -13.3383393748), (-102.9065657173, -13.1494823664), (-103.0332421045, -12.9751272773), (-103.1807720977, -12.8180237913), (-103.3468290607, -12.6806495244), (-103.5287941761, -12.5651709507), (-103.7237977452, -12.4734092363), (-103.9287644453, -12.4068115184), (-104.1404618291, -12.3664280827), (-104.3555513024, -12.3528958), (-104.5706407757, -12.3664280827), (-104.7823381595, -12.4068115184), (-104.9873048596, -12.4734092363), (-105.1823084288, -12.5651709507), (-105.3642735441, -12.6806495244), (-105.5303305072, -12.8180237913), (-105.6778605004, -12.9751272773), (-105.8045368876, -13.1494823664), (-105.9083619066, -13.3383393748), (-105.9876981747, -13.5387199147), (-106.0412945117, -13.7474638651), (-106.0683056712, -13.9612792094), (-106.0683056712, -14.1767939518), (-106.0412945117, -14.3906092961), (-105.9876981747, -14.5993532466), (-105.9083619066, -14.7997337864), (-105.8045368876, -14.9885907948), (-105.6778605004, -15.162945884), (-105.5303305072, -15.3200493699), (-105.3642735441, -15.4574236369), (-105.1823084288, -15.5729022106), (-104.9873048596, -15.6646639249), (-104.7823381595, -15.7312616428), (-104.5706407757, -15.7716450786), (-104.3555513024, -15.7851773612), (-104.1404618291, -15.7716450786), (-103.9287644453, -15.7312616428), (-103.7237977452, -15.6646639249), (-103.5287941761, -15.5729022106), (-103.3468290607, -15.4574236369), (-103.1807720977, -15.3200493699), (-103.0332421045, -15.162945884), (-102.9065657173, -14.9885907948), (-102.8027406983, -14.7997337864), (-102.7234044302, -14.5993532466), (-102.6698080932, -14.3906092961), align=None)
    extrude(amount=F3_DEPTH)


with BuildPart() as f4:
    # F0 (on Top) → F4 (new body)
    with BuildSketch(Plane.XY):
        with BuildLine():
            Line((-7.4435880441, 31.6859185696), (-17.4465656341, 31.6859185696))
            ThreePointArc((-17.4465656341, 31.6859185696), (-21.8631038448, 28.8163977328), (-25.8161057919, 25.3359185696))
            Line((-25.8161057919, 25.3359185696), (-9.2491013341, 25.3359185696))
            Line((-9.2491013341, 25.3359185696), (-6.1460616902, 30.7105408908))
            Line((-6.1460616902, 30.7105408908), (-6.9347475286, 31.3629985591))
            Line((-6.9347475286, 31.3629985591), (-7.4435880441, 31.6859185696))
        make_face()
    extrude(amount=F4_DEPTH)


solid = Compound([f1.part, f2.part, f4.part])
